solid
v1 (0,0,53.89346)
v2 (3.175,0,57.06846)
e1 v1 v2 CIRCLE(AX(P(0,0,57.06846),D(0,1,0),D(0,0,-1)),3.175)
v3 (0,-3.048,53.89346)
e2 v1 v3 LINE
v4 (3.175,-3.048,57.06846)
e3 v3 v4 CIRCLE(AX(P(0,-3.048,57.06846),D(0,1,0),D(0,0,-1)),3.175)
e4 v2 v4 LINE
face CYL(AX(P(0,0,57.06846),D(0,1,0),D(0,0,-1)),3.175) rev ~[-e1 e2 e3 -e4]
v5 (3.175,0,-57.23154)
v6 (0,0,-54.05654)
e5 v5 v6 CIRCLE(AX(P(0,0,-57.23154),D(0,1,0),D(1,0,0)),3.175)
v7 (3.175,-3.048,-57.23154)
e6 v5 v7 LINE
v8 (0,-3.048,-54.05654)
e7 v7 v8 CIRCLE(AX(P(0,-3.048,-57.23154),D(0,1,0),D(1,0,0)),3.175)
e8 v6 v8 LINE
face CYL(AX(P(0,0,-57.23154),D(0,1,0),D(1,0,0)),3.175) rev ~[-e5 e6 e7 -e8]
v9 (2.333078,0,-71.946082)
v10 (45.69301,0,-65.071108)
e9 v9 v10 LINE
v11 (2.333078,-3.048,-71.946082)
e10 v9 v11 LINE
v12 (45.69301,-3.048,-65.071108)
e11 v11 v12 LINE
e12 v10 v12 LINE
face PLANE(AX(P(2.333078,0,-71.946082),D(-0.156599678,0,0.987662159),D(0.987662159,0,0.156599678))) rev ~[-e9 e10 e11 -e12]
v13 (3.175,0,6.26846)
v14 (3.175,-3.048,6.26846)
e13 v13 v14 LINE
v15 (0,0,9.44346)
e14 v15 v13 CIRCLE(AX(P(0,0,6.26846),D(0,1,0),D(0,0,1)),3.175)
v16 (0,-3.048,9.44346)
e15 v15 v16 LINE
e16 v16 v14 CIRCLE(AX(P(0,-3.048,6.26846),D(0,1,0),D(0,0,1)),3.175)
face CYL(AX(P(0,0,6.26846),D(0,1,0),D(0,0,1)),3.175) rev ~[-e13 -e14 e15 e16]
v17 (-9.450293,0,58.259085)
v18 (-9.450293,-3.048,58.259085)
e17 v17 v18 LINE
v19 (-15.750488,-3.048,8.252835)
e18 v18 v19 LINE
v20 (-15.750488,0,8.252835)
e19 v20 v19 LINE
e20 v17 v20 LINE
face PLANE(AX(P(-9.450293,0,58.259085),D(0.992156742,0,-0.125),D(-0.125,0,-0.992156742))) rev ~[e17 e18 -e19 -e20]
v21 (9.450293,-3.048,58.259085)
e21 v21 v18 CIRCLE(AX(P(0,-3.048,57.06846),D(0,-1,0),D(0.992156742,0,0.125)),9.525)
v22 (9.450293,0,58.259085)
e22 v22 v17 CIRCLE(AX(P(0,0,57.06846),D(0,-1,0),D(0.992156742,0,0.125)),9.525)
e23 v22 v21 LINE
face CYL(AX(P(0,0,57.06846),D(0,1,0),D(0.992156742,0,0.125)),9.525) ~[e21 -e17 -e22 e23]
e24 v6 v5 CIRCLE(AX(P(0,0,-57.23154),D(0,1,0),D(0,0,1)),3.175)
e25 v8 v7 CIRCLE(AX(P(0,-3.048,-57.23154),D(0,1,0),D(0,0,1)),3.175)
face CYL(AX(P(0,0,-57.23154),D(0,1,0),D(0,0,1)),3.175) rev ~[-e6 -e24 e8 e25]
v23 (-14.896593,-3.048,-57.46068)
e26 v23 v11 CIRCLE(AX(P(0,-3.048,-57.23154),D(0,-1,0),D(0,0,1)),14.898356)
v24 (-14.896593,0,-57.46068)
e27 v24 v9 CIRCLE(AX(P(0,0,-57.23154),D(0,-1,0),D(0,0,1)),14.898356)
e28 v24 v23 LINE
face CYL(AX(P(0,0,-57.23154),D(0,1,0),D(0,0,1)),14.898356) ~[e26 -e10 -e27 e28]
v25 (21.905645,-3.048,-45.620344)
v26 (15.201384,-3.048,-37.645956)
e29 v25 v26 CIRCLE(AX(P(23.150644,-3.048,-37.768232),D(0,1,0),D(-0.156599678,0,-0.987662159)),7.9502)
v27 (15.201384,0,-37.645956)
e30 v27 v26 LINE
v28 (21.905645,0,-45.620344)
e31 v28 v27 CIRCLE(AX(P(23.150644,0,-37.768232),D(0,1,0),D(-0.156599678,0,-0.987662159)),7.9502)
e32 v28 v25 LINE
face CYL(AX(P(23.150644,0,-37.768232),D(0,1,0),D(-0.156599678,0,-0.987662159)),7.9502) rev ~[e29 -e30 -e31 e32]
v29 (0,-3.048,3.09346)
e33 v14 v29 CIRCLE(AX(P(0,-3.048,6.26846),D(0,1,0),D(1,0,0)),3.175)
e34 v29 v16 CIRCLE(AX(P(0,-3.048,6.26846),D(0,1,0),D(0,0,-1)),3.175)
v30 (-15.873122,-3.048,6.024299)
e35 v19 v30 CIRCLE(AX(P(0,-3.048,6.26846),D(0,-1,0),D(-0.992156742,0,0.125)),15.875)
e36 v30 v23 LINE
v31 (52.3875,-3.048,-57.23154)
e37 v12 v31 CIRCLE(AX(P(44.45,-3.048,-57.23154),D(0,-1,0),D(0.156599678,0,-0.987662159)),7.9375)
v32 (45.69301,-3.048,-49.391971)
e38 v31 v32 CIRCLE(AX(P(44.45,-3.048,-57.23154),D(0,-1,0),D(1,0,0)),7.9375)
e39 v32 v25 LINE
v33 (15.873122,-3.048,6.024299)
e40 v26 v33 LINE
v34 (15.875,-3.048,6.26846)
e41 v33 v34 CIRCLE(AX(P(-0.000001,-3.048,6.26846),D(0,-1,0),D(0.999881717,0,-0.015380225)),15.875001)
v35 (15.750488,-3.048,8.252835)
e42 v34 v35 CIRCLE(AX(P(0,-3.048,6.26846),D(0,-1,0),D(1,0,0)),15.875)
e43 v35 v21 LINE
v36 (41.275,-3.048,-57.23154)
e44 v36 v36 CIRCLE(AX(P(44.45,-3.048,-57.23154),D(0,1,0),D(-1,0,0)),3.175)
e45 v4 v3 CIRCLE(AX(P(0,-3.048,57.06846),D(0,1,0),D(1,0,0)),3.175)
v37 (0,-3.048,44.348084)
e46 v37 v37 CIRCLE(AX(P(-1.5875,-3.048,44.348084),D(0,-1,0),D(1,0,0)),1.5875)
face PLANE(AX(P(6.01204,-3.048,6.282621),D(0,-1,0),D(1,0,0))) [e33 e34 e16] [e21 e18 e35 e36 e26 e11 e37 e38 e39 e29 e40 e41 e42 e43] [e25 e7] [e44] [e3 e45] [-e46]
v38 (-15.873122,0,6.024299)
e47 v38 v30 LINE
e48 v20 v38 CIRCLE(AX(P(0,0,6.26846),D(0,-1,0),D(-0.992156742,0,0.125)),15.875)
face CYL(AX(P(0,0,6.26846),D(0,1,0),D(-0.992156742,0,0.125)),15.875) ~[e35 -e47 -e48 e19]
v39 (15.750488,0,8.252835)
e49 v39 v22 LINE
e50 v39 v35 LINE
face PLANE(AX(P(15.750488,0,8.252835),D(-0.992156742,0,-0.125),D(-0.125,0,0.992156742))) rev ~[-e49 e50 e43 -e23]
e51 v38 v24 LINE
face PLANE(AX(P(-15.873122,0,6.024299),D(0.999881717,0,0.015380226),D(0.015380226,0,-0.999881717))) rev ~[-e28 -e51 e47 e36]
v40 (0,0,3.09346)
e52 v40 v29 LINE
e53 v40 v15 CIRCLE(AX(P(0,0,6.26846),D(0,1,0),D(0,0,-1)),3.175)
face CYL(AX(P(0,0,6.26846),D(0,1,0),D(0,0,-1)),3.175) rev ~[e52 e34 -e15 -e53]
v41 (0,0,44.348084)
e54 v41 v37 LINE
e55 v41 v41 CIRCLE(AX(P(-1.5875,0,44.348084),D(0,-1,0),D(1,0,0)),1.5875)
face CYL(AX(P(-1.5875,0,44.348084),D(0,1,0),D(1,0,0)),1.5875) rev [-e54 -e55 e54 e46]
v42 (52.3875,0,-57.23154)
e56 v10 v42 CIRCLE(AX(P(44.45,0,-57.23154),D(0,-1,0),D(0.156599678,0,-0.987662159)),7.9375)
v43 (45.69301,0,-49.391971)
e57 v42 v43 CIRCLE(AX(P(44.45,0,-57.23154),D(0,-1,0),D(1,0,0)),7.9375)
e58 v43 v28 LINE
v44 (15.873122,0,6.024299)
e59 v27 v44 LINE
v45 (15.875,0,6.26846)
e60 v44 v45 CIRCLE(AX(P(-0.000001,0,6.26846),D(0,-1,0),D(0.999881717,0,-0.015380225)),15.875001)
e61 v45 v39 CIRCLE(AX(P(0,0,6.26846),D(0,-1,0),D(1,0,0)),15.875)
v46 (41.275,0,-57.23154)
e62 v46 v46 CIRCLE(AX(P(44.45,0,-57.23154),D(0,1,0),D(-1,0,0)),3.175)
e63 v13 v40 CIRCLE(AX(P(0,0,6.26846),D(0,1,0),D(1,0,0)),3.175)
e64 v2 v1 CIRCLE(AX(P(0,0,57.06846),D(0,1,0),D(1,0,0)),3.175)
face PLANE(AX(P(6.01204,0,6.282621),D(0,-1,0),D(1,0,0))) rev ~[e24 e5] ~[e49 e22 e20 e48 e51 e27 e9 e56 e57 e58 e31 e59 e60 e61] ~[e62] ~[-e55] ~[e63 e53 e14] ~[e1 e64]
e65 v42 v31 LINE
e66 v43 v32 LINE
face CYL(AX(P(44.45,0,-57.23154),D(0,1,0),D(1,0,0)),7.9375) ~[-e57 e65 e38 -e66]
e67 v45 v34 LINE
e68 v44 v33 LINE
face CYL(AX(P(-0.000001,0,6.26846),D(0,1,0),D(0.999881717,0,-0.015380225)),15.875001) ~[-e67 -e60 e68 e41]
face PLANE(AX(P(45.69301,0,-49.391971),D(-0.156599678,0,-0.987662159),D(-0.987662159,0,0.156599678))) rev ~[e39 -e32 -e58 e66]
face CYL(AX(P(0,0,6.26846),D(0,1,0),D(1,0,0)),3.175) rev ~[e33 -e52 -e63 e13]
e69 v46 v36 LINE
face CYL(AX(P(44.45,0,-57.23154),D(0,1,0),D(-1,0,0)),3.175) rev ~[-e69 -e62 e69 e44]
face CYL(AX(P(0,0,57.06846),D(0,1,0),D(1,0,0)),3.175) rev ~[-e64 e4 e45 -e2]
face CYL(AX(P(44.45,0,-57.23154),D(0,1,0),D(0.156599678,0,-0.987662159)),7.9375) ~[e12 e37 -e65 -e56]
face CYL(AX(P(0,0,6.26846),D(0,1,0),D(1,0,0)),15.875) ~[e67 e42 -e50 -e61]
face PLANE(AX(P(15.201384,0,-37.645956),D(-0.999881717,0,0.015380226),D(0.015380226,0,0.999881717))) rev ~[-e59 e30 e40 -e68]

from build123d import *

# Parameters (mm, degrees)
F0_R     = 1.5875
F1_DEPTH = 3.048


# Not quite as in the source:
# - a feature names something its author has since deleted; it is built from what else it names


with BuildPart() as f1:
    # F0 (on Front) → F1 (new body)
    with BuildSketch(Plane.XZ):
        with BuildLine():
            Line((0, 3.0934604908), (0, 0))
            Line((0, 0), (0, -9.6065395092))
            ThreePointArc((0, -9.6065395092), (11.1386616751, -5.0428542466), (15.8731222627, 6.024299409))
            ThreePointArc((15.8731222627, 6.024299409), (15.8745305587, 6.1463763397), (15.875, 6.2684604908))
            ThreePointArc((15.875, 6.2684604908), (15.8438414904, 7.2625992274), (15.7504882737, 8.2528354908))
            ThreePointArc((15.7504882737, 8.2528354908), (10.5003255158, 18.1747104908), (0, 22.1434604908))
            Line((0, 22.1434604908), (0, 9.4434604908))
            ThreePointArc((0, 9.4434604908), (2.2450640303, 8.513524521), (3.175, 6.2684604908))
            ThreePointArc((3.175, 6.2684604908), (2.2450640303, 4.0233964605), (0, 3.0934604908))
        make_face()
        with BuildLine():
            Line((0, -9.6065395092), (0, 0))
            Line((0, 0), (0, 3.0934604908))
            ThreePointArc((0, 3.0934604908), (-3.175, 6.2684604908), (0, 9.4434604908))
            Line((0, 9.4434604908), (0, 22.1434604908))
            ThreePointArc((0, 22.1434604908), (-10.5003255158, 18.1747104908), (-15.7504882737, 8.2528354908))
            ThreePointArc((-15.7504882737, 8.2528354908), (-15.8510182356, 7.1407252981), (-15.8731222627, 6.024299409))
            ThreePointArc((-15.8731222627, 6.024299409), (-11.1386616751, -5.0428542466), (0, -9.6065395092))
        make_face()
        with BuildLine():
            ThreePointArc((15.8731222627, 6.024299409), (11.1386616751, -5.0428542466), (0, -9.6065395092))
            Line((0, -9.6065395092), (0, -42.3331838364))
            ThreePointArc((0, -42.3331838364), (10.5347283248, -46.6968111845), (14.8983556728, -57.2315395092))
            Line((14.8983556728, -57.2315395092), (36.5125, -57.2315395092))
            ThreePointArc((36.5125, -57.2315395092), (39.2955109449, -51.1953860295), (45.6930099416, -49.3919711196))
            Line((45.6930099416, -49.3919711196), (21.9056452954, -45.6203437456))
            ThreePointArc((21.9056452954, -45.6203437456), (17.0653083108, -42.8843212703), (15.2013844237, -37.6459561768))
            Line((15.2013844237, -37.6459561768), (15.8731222627, 6.024299409))
        make_face()
        with BuildLine():
            Line((0, -42.3331838364), (0, -9.6065395092))
            ThreePointArc((0, -9.6065395092), (-11.1386616751, -5.0428542466), (-15.8731222627, 6.024299409))
            Line((-15.8731222627, 6.024299409), (-14.8965934556, -57.4606795809))
            ThreePointArc((-14.8965934556, -57.4606795809), (-10.6154324462, -46.778138353), (0, -42.3331838364))
        make_face()
        with BuildLine():
            ThreePointArc((14.8983556728, -57.2315395092), (10.5347283248, -46.6968111845), (0, -42.3331838364))
            Line((0, -42.3331838364), (0, -54.0565395092))
            ThreePointArc((0, -54.0565395092), (2.2450640303, -54.986475479), (3.175, -57.2315395092))
            Line((3.175, -57.2315395092), (14.8983556728, -57.2315395092))
        make_face()
        with BuildLine():
            Line((0, -54.0565395092), (0, -42.3331838364))
            ThreePointArc((0, -42.3331838364), (-10.6154324462, -46.778138353), (-14.8965934556, -57.4606795809))
            ThreePointArc((-14.8965934556, -57.4606795809), (-9.5873458416, -68.6352144199), (2.3330776963, -71.9460816433))
            ThreePointArc((2.3330776963, -71.9460816433), (11.32960774, -66.9062999823), (14.8983556728, -57.2315395092))
            Line((14.8983556728, -57.2315395092), (3.175, -57.2315395092))
            ThreePointArc((3.175, -57.2315395092), (-2.2450640303, -59.4766035395), (0, -54.0565395092))
        make_face()
        with BuildLine():
            Line((36.5125, -57.2315395092), (14.8983556728, -57.2315395092))
            ThreePointArc((14.8983556728, -57.2315395092), (11.32960774, -66.9062999823), (2.3330776963, -71.9460816433))
            Line((2.3330776963, -71.9460816433), (45.6930099416, -65.0711078988))
            ThreePointArc((45.6930099416, -65.0711078988), (39.2955109449, -63.2676929889), (36.5125, -57.2315395092))
        make_face()
        with BuildLine():
            Line((-9.4502929642, 58.2590854908), (-15.7504882737, 8.2528354908))
            ThreePointArc((-15.7504882737, 8.2528354908), (-10.5003255158, 18.1747104908), (0, 22.1434604908))
            Line((0, 22.1434604908), (0, 44.3480842421))
            Line((0, 44.3480842421), (0, 47.5434604908))
            ThreePointArc((0, 47.5434604908), (-7.14375, 50.7682651813), (-9.4502929642, 58.2590854908))
        make_face()
        with Locations((-1.5875, 44.3480842421)):
            Circle(F0_R, mode=Mode.SUBTRACT)
        with BuildLine():
            Line((0, 44.3480842421), (0, 22.1434604908))
            ThreePointArc((0, 22.1434604908), (10.5003255158, 18.1747104908), (15.7504882737, 8.2528354908))
            Line((15.7504882737, 8.2528354908), (9.4502929642, 58.2590854908))
            ThreePointArc((9.4502929642, 58.2590854908), (9.5063048942, 57.6649437327), (9.525, 57.0684604908))
            ThreePointArc((9.525, 57.0684604908), (6.7351920908, 50.3332684), (0, 47.5434604908))
            Line((0, 47.5434604908), (0, 44.3480842421))
        make_face()
        with BuildLine():
            ThreePointArc((45.6930099416, -49.3919711196), (39.2955109449, -51.1953860295), (36.5125, -57.2315395092))
            ThreePointArc((36.5125, -57.2315395092), (39.2955109449, -63.2676929889), (45.6930099416, -65.0711078988))
            ThreePointArc((45.6930099416, -65.0711078988), (50.4861534797, -62.3860285644), (52.3875, -57.2315395092))
            ThreePointArc((52.3875, -57.2315395092), (50.4861534797, -52.0770504541), (45.6930099416, -49.3919711196))
        make_face()
        with BuildLine():
            ThreePointArc((47.625, -57.2315395092), (44.45, -60.4065395092), (41.275, -57.2315395092))
            ThreePointArc((41.275, -57.2315395092), (44.45, -54.0565395092), (47.625, -57.2315395092))
        make_face(mode=Mode.SUBTRACT)
        with BuildLine():
            ThreePointArc((9.4502929642, 58.2590854908), (0, 66.5934604908), (-9.4502929642, 58.2590854908))
            ThreePointArc((-9.4502929642, 58.2590854908), (-7.14375, 50.7682651813), (0, 47.5434604908))
            ThreePointArc((0, 47.5434604908), (6.7351920908, 50.3332684), (9.525, 57.0684604908))
            ThreePointArc((9.525, 57.0684604908), (9.5063048942, 57.6649437327), (9.4502929642, 58.2590854908))
        make_face()
        with BuildLine():
            ThreePointArc((3.175, 57.0684604908), (2.2450640303, 54.8233964605), (0, 53.8934604908))
            ThreePointArc((0, 53.8934604908), (-2.2450640303, 59.313524521), (3.175, 57.0684604908))
        make_face(mode=Mode.SUBTRACT)
    extrude(amount=F1_DEPTH)


solid = f1.part
